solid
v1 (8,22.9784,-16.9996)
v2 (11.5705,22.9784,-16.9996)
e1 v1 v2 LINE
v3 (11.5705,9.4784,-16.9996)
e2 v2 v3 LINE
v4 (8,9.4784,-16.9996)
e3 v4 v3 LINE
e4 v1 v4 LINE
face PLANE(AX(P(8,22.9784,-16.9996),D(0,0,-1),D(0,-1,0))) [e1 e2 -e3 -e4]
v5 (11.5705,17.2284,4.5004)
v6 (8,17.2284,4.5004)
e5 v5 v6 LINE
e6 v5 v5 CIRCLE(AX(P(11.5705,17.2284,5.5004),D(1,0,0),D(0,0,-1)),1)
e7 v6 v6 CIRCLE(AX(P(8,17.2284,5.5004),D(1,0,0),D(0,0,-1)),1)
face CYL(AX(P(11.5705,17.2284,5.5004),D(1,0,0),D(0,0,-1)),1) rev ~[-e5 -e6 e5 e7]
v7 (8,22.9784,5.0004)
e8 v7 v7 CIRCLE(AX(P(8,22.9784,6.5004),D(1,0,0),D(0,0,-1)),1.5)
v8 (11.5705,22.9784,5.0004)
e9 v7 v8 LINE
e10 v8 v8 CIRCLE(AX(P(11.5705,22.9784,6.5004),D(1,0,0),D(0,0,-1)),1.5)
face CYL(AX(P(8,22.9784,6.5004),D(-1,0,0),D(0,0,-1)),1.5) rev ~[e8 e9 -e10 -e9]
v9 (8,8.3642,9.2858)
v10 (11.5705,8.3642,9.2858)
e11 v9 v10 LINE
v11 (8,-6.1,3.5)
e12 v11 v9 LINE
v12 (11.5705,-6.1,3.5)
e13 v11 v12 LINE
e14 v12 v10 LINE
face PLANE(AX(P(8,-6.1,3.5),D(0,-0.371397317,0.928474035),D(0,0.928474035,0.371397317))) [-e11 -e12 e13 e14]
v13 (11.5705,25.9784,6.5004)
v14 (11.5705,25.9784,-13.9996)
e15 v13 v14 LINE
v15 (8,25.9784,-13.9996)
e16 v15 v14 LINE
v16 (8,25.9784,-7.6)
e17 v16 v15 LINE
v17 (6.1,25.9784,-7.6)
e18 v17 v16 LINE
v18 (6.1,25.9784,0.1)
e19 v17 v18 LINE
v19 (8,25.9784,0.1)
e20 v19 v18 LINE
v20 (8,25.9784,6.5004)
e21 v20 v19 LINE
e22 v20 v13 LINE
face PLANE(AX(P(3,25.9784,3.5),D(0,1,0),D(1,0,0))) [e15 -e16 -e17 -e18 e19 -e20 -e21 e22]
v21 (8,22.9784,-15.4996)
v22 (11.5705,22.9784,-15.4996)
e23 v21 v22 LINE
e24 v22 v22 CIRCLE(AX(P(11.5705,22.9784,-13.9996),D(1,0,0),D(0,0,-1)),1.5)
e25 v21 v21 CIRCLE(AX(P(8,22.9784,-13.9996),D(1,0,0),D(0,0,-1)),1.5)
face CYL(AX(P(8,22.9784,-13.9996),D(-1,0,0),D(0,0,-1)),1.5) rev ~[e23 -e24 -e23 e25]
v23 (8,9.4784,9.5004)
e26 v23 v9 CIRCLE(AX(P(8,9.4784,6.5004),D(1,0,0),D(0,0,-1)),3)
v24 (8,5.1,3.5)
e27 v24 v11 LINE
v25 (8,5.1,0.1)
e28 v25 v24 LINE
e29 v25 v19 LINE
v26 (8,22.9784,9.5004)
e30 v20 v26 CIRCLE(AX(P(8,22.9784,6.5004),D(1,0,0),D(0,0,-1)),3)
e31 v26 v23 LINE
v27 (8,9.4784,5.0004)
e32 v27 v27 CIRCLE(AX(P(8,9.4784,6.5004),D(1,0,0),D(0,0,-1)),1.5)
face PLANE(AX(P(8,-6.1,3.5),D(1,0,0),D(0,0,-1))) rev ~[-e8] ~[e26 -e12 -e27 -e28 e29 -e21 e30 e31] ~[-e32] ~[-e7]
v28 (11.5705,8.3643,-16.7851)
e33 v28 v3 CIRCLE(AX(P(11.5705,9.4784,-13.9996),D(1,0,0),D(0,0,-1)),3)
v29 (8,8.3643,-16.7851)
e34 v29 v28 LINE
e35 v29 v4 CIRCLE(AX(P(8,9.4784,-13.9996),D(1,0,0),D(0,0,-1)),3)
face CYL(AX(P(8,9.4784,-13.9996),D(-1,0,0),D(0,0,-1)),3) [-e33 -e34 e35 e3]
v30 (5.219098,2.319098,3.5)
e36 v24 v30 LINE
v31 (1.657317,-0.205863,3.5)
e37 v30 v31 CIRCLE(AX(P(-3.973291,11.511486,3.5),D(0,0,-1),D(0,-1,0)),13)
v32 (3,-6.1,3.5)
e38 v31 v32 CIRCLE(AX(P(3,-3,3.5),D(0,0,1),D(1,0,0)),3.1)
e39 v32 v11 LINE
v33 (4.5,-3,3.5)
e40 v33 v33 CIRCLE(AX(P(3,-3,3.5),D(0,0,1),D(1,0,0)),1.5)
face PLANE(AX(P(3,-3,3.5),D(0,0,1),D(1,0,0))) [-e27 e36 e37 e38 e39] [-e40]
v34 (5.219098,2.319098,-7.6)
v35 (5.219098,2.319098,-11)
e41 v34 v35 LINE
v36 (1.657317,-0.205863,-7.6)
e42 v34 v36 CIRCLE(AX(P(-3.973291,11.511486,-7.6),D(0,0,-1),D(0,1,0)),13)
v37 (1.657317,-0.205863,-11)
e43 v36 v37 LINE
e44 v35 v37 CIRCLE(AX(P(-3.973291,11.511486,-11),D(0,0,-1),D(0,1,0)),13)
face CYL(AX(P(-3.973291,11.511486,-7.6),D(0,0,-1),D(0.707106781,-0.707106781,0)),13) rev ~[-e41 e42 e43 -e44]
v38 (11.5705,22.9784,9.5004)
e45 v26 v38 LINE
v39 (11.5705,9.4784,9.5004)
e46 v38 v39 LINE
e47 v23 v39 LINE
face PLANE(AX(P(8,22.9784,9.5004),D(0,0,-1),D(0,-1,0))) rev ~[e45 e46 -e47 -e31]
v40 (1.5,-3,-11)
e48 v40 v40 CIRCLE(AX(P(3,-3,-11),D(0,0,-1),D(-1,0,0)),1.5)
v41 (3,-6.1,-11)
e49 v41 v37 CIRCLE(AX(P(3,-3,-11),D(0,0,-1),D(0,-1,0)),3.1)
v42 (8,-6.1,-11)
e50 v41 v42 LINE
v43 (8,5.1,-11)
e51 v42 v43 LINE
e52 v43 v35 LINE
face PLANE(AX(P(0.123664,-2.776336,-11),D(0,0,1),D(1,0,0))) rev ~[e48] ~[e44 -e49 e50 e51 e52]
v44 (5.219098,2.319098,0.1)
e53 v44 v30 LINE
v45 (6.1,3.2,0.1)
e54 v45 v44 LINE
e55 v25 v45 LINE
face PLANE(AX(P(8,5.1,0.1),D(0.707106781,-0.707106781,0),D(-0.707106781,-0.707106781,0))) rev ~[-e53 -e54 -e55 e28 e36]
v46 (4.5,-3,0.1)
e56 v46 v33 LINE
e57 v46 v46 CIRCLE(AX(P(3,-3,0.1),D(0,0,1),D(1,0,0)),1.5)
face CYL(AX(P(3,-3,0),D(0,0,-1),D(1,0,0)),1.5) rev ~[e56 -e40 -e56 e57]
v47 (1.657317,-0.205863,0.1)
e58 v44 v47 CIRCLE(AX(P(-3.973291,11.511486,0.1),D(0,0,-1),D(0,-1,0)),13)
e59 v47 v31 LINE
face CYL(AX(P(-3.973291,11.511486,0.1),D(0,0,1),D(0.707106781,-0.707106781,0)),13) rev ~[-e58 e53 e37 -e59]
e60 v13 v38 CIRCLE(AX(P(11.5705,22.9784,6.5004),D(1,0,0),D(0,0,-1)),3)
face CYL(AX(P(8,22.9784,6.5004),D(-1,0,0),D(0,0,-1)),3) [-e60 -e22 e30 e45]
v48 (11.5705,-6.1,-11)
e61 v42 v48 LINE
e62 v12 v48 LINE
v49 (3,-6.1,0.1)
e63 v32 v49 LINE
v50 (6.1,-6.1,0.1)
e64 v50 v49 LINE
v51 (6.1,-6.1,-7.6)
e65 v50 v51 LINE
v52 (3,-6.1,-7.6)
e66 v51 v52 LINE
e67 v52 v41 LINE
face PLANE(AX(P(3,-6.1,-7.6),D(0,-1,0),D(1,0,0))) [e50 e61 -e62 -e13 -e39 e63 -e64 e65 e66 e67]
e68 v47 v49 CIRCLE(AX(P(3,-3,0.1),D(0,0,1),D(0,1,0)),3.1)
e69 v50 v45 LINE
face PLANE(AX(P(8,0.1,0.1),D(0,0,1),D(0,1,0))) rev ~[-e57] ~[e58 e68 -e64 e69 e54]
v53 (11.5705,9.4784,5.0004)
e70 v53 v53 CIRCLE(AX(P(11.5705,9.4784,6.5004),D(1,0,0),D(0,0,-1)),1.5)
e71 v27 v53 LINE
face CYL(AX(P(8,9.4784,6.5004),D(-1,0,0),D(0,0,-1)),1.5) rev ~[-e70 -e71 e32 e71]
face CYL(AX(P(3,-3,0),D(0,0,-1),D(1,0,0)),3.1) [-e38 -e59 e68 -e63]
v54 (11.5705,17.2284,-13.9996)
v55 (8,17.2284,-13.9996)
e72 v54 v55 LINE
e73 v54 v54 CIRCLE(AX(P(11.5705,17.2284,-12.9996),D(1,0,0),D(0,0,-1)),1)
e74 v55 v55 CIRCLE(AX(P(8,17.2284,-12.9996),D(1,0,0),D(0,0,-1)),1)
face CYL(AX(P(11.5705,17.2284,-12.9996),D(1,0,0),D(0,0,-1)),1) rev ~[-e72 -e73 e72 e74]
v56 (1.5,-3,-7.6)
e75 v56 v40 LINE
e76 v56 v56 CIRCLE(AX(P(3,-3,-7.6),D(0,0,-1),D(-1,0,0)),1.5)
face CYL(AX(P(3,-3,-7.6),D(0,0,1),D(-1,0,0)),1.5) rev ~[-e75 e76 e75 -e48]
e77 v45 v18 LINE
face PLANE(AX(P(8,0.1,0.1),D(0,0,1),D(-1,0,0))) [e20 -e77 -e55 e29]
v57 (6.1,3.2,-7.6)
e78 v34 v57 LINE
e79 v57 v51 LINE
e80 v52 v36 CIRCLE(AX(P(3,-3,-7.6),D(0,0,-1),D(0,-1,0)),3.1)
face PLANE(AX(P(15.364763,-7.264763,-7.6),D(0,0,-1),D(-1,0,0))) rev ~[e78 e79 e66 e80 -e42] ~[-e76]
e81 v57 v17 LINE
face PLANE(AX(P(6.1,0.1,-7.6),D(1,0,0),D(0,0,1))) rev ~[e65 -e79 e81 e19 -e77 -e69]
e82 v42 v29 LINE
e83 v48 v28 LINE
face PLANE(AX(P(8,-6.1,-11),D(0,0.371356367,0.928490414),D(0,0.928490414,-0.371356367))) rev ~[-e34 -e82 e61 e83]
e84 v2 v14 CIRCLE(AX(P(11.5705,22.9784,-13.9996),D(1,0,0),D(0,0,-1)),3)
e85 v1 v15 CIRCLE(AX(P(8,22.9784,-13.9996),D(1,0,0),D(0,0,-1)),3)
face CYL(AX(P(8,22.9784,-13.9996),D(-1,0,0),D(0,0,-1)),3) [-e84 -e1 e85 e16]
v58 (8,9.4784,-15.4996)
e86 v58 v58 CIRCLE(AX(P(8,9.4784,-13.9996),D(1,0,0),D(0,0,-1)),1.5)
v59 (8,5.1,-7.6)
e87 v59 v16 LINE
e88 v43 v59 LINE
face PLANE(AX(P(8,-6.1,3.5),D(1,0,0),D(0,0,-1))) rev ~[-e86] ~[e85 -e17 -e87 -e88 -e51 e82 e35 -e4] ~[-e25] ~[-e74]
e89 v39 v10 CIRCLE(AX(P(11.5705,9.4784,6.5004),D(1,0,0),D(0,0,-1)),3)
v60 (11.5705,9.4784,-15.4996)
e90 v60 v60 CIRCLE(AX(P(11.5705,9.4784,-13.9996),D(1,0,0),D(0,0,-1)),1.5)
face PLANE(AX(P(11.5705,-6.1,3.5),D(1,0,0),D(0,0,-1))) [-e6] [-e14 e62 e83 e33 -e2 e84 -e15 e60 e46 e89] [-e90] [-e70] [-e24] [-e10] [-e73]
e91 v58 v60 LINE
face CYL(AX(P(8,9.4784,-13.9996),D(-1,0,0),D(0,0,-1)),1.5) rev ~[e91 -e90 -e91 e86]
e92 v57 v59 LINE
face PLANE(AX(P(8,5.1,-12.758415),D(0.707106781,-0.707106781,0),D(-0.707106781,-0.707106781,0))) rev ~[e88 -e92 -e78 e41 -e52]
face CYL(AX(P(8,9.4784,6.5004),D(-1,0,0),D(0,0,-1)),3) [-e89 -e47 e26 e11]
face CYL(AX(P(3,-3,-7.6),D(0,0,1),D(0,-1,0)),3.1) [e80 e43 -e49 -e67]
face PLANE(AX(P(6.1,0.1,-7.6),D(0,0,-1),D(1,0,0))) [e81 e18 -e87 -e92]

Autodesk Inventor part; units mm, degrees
ref_plane "YZ Plane" through (0, 0, 0) normal (1, 0, 0) x (0, 1, 0)
sketch "Sketch1" plane through (0, 0, 0) normal (0, 0, 1) x (1, 0, 0)
  circle A0 centre (3, -3) radius 1.5 projected
  arc A1 (4.6242, -5.5223) -> (3, 0) centre (3, -3) ccw projected
  arc A2 (4.6783, -5.6064) -> (3, 0.1) centre (3, -3) ccw
  circle A3 centre (3, -3) radius 3.1
  point P0 (0, 0)
  point P1 (3, 0.1)
  dimension "d0" = 0.1
extrude "Extrusion1" add sketch "Sketch1" along normal blind 3.5
sketch "Sketch2" plane through (3, -3, 0) normal (0, 0, -1) x (-1, 0, 0)
  circle A0 centre (0, 0) radius 3.1 projected
  point P0 (3, 3)
extrude "Extrusion2" cut sketch "Sketch2" against normal blind 0.1
sketch "Sketch3" plane through (3, -3, 3.5) normal (0, 0, 1) x (1, 0, 0)
  circle A0 centre (0, 0) radius 3.1 projected
  line L0 (0, 3.1) -> (5, 3.1)
  line L1 (0, -3.1) -> (5, -3.1)
  line L2 (5, -3.1) -> (5, 3.1)
  point P0 (-3, 3)
  dimension "d5" = 5
  dimension "d6" = 5
ref_plane "Work Plane1" through (-0.6712, -8.5, -7.5) normal (0, 0, -1) x (0, 1, 0)
extrude "Extrusion3" add sketch "Sketch3" against normal up to surface (11 mm away) contours A0 L0 L2 L1
sketch "Sketch4" plane through (8, 0.1, -7.5) normal (0, 0, -1) x (-1, 0, 0)
  arc A0 (5, 0) -> (5, -6.2) centre (5, -3.1) ccw projected
  line L0 (0, 0) -> (5, 0) projected
  line L1 (0, -6.2) -> (0, 0) projected
  line L2 (5, -6.2) -> (0, -6.2) projected
  point P0 (8, -0.1)
extrude "Extrusion4" add sketch "Sketch4" along normal blind 0.1
sketch "Sketch5" plane through (8, 0.1, -7.6) normal (0, 0, -1) x (-1, 0, 0)
  arc A0 (5, -6.2) -> (5, 0) centre (5, -3.1) ccw projected
  line L0 (5, -6.2) -> (0, -6.2) projected
  line L1 (0, -6.2) -> (0, 0) projected
  line L2 (0, 0) -> (5, 0) projected
  circle A1 centre (5, -3.1) radius 1.5 projected
  point P0 (8, -0.1)
extrude "Extrusion5" add sketch "Sketch5" along normal blind 3.4
sketch "Sketch6" plane through (3, 0.1, 3.5) normal (0, 1, 0) x (1, 0, 0)
  line L0 (0, 3.5) -> (3, 3.5) projected
  line L1 (0, 11.1) -> (3.1, 11.1) projected
  line L2 (0, 3.4) -> (0, 11.1) projected
  line L3 (0, 3.4) -> (3.1, 3.4) projected
  line L4 (3.1, 3.4) -> (0, 3.4)
  line L5 (0, 3.4) -> (0, 11.1)
  line L6 (0, 11.1) -> (3.1, 11.1)
  line L7 (3.1, 11.1) -> (3.1, 3.4)
  point P0 (-3, 3.5)
extrude "Extrusion6" cut sketch "Sketch6" against normal through all
sketch "Sketch7" plane through (8, -6.1, 3.5) normal (1, 0, 0) x (0, 0, -1)
  line L0 (0, 0) -> (14.5, 0) projected
  line L1 (7.25, 0) -> (7.25, 35.3128)
  line L2 (7.25, 0) -> (42.5628, 0) construction
  point P0 (3.5, 6.1)
  dimension "d15" = 90
sketch "Sketch8" plane through (8, -6.1, 3.5) normal (1, 0, 0) x (0, 0, -1)
  circle A0 centre (-3.0004, 15.5784) radius 1.1 projected
  circle A1 centre (-3.0004, 29.0784) radius 1.1 projected
  circle A2 centre (17.4996, 29.0784) radius 1.1 projected
  circle A3 centre (17.4996, 15.5784) radius 1.1 projected
  circle A4 centre (-3.0004, 15.5784) radius 1.5
  circle A5 centre (-3.0004, 29.0784) radius 1.5
  circle A6 centre (17.4996, 29.0784) radius 1.5
  circle A7 centre (17.4996, 15.5784) radius 1.5
  circle A8 centre (17.4996, 15.5784) radius 3
  circle A9 centre (17.4996, 29.0784) radius 3
  circle A10 centre (-3.0004, 29.0784) radius 3
  circle A11 centre (-3.0004, 15.5784) radius 3
  line L0 (-3.0004, 32.0784) -> (17.4996, 32.0784)
  line L1 (-6.0004, 29.0784) -> (-6.0004, 15.5784)
  line L2 (20.4996, 29.0784) -> (20.4996, 15.5784)
  line L3 (-3.0004, 12.5784) -> (17.4996, 12.5784)
  line L4 (0, 6.2) -> (14.5, 6.2) projected
  line L5 (0, 0) -> (0, 6.2) projected
  line L6 (0, 0) -> (14.5, 0) projected
  line L7 (14.5, 6.2) -> (14.5, 0) projected
  line L8 (0, 0) -> (-5.7858, 14.4642)
  line L9 (14.5, 0) -> (20.2851, 14.4643)
  point P0 (3.5, 6.1)
  dimension "d16" = 3
  dimension "d17" = 3
  dimension "d18" = 3
  dimension "d19" = 3
  dimension "d20" = 6
  dimension "d21" = 6
  dimension "d22" = 6
  dimension "d23" = 6
ref_plane "Work Plane2" through (11.5705, 1.2284, -16.2496) normal (-1, 0, 0) x (0, 0, 1)
extrude "Extrusion7" add sketch "Sketch8" along normal up to surface (3.5705 mm away) contours A8 | A8 L3 A11 L1 A10 L0 A9 L2 | A8 L9 L7 L4 L5 L8 A11 L3 | A9 | A11 | L6 L5 L4 L7 | A10
sketch "Sketch9" plane through (3, 0.1, 3.5) normal (0, 1, 0) x (1, 0, 0)
  line L0 (3.1, 11.1) -> (3.1, 3.4) projected
  line L1 (5, 17.4996) -> (5, -3.0004) projected
  line L2 (3.1, 11.1) -> (0, 11.1) projected
  line L3 (3.1, 11.1) -> (5, 11.1)
  line L4 (5, 11.1) -> (5, 3.4)
  line L5 (5, 3.4) -> (3.1, 3.4)
  line L6 (3.1, 3.4) -> (3.1, 11.1)
  point P0 (-3, 3.5)
  point P1 (3.1, 3.4)
  point P2 (5, 11.1)
extrude "Extrusion8" add sketch "Sketch9" along normal up to surface (25.8784 mm away)
sketch "Sketch10" plane through (11.5705, 9.4784, -16.9996) normal (1, 0, 0) x (0, 0, -1)
  circle A0 centre (-22.5, 7.75) radius 0.5 projected
  circle A1 centre (-4, 7.75) radius 0.5 projected
  circle A2 centre (-22.5, 7.75) radius 1
  circle A3 centre (-4, 7.75) radius 1
  point P0 (-16.9996, -9.4784)
  dimension "d29" = 2
  dimension "d30" = 2
extrude "Extrusion9" cut sketch "Sketch10" against normal through all contours A0 | A1 | A2 | A3
chamfer "Chamfer1" distance 5 angle 45 2 edges at (8, 0.1, 1.8) (8, 0.1, -9.3)
fillet "Fillet1" radius 13 2 edges at (3, 0.1, -9.3) (3, 0.1, 1.8)
properties part number "TheCamera_3DPrint"
